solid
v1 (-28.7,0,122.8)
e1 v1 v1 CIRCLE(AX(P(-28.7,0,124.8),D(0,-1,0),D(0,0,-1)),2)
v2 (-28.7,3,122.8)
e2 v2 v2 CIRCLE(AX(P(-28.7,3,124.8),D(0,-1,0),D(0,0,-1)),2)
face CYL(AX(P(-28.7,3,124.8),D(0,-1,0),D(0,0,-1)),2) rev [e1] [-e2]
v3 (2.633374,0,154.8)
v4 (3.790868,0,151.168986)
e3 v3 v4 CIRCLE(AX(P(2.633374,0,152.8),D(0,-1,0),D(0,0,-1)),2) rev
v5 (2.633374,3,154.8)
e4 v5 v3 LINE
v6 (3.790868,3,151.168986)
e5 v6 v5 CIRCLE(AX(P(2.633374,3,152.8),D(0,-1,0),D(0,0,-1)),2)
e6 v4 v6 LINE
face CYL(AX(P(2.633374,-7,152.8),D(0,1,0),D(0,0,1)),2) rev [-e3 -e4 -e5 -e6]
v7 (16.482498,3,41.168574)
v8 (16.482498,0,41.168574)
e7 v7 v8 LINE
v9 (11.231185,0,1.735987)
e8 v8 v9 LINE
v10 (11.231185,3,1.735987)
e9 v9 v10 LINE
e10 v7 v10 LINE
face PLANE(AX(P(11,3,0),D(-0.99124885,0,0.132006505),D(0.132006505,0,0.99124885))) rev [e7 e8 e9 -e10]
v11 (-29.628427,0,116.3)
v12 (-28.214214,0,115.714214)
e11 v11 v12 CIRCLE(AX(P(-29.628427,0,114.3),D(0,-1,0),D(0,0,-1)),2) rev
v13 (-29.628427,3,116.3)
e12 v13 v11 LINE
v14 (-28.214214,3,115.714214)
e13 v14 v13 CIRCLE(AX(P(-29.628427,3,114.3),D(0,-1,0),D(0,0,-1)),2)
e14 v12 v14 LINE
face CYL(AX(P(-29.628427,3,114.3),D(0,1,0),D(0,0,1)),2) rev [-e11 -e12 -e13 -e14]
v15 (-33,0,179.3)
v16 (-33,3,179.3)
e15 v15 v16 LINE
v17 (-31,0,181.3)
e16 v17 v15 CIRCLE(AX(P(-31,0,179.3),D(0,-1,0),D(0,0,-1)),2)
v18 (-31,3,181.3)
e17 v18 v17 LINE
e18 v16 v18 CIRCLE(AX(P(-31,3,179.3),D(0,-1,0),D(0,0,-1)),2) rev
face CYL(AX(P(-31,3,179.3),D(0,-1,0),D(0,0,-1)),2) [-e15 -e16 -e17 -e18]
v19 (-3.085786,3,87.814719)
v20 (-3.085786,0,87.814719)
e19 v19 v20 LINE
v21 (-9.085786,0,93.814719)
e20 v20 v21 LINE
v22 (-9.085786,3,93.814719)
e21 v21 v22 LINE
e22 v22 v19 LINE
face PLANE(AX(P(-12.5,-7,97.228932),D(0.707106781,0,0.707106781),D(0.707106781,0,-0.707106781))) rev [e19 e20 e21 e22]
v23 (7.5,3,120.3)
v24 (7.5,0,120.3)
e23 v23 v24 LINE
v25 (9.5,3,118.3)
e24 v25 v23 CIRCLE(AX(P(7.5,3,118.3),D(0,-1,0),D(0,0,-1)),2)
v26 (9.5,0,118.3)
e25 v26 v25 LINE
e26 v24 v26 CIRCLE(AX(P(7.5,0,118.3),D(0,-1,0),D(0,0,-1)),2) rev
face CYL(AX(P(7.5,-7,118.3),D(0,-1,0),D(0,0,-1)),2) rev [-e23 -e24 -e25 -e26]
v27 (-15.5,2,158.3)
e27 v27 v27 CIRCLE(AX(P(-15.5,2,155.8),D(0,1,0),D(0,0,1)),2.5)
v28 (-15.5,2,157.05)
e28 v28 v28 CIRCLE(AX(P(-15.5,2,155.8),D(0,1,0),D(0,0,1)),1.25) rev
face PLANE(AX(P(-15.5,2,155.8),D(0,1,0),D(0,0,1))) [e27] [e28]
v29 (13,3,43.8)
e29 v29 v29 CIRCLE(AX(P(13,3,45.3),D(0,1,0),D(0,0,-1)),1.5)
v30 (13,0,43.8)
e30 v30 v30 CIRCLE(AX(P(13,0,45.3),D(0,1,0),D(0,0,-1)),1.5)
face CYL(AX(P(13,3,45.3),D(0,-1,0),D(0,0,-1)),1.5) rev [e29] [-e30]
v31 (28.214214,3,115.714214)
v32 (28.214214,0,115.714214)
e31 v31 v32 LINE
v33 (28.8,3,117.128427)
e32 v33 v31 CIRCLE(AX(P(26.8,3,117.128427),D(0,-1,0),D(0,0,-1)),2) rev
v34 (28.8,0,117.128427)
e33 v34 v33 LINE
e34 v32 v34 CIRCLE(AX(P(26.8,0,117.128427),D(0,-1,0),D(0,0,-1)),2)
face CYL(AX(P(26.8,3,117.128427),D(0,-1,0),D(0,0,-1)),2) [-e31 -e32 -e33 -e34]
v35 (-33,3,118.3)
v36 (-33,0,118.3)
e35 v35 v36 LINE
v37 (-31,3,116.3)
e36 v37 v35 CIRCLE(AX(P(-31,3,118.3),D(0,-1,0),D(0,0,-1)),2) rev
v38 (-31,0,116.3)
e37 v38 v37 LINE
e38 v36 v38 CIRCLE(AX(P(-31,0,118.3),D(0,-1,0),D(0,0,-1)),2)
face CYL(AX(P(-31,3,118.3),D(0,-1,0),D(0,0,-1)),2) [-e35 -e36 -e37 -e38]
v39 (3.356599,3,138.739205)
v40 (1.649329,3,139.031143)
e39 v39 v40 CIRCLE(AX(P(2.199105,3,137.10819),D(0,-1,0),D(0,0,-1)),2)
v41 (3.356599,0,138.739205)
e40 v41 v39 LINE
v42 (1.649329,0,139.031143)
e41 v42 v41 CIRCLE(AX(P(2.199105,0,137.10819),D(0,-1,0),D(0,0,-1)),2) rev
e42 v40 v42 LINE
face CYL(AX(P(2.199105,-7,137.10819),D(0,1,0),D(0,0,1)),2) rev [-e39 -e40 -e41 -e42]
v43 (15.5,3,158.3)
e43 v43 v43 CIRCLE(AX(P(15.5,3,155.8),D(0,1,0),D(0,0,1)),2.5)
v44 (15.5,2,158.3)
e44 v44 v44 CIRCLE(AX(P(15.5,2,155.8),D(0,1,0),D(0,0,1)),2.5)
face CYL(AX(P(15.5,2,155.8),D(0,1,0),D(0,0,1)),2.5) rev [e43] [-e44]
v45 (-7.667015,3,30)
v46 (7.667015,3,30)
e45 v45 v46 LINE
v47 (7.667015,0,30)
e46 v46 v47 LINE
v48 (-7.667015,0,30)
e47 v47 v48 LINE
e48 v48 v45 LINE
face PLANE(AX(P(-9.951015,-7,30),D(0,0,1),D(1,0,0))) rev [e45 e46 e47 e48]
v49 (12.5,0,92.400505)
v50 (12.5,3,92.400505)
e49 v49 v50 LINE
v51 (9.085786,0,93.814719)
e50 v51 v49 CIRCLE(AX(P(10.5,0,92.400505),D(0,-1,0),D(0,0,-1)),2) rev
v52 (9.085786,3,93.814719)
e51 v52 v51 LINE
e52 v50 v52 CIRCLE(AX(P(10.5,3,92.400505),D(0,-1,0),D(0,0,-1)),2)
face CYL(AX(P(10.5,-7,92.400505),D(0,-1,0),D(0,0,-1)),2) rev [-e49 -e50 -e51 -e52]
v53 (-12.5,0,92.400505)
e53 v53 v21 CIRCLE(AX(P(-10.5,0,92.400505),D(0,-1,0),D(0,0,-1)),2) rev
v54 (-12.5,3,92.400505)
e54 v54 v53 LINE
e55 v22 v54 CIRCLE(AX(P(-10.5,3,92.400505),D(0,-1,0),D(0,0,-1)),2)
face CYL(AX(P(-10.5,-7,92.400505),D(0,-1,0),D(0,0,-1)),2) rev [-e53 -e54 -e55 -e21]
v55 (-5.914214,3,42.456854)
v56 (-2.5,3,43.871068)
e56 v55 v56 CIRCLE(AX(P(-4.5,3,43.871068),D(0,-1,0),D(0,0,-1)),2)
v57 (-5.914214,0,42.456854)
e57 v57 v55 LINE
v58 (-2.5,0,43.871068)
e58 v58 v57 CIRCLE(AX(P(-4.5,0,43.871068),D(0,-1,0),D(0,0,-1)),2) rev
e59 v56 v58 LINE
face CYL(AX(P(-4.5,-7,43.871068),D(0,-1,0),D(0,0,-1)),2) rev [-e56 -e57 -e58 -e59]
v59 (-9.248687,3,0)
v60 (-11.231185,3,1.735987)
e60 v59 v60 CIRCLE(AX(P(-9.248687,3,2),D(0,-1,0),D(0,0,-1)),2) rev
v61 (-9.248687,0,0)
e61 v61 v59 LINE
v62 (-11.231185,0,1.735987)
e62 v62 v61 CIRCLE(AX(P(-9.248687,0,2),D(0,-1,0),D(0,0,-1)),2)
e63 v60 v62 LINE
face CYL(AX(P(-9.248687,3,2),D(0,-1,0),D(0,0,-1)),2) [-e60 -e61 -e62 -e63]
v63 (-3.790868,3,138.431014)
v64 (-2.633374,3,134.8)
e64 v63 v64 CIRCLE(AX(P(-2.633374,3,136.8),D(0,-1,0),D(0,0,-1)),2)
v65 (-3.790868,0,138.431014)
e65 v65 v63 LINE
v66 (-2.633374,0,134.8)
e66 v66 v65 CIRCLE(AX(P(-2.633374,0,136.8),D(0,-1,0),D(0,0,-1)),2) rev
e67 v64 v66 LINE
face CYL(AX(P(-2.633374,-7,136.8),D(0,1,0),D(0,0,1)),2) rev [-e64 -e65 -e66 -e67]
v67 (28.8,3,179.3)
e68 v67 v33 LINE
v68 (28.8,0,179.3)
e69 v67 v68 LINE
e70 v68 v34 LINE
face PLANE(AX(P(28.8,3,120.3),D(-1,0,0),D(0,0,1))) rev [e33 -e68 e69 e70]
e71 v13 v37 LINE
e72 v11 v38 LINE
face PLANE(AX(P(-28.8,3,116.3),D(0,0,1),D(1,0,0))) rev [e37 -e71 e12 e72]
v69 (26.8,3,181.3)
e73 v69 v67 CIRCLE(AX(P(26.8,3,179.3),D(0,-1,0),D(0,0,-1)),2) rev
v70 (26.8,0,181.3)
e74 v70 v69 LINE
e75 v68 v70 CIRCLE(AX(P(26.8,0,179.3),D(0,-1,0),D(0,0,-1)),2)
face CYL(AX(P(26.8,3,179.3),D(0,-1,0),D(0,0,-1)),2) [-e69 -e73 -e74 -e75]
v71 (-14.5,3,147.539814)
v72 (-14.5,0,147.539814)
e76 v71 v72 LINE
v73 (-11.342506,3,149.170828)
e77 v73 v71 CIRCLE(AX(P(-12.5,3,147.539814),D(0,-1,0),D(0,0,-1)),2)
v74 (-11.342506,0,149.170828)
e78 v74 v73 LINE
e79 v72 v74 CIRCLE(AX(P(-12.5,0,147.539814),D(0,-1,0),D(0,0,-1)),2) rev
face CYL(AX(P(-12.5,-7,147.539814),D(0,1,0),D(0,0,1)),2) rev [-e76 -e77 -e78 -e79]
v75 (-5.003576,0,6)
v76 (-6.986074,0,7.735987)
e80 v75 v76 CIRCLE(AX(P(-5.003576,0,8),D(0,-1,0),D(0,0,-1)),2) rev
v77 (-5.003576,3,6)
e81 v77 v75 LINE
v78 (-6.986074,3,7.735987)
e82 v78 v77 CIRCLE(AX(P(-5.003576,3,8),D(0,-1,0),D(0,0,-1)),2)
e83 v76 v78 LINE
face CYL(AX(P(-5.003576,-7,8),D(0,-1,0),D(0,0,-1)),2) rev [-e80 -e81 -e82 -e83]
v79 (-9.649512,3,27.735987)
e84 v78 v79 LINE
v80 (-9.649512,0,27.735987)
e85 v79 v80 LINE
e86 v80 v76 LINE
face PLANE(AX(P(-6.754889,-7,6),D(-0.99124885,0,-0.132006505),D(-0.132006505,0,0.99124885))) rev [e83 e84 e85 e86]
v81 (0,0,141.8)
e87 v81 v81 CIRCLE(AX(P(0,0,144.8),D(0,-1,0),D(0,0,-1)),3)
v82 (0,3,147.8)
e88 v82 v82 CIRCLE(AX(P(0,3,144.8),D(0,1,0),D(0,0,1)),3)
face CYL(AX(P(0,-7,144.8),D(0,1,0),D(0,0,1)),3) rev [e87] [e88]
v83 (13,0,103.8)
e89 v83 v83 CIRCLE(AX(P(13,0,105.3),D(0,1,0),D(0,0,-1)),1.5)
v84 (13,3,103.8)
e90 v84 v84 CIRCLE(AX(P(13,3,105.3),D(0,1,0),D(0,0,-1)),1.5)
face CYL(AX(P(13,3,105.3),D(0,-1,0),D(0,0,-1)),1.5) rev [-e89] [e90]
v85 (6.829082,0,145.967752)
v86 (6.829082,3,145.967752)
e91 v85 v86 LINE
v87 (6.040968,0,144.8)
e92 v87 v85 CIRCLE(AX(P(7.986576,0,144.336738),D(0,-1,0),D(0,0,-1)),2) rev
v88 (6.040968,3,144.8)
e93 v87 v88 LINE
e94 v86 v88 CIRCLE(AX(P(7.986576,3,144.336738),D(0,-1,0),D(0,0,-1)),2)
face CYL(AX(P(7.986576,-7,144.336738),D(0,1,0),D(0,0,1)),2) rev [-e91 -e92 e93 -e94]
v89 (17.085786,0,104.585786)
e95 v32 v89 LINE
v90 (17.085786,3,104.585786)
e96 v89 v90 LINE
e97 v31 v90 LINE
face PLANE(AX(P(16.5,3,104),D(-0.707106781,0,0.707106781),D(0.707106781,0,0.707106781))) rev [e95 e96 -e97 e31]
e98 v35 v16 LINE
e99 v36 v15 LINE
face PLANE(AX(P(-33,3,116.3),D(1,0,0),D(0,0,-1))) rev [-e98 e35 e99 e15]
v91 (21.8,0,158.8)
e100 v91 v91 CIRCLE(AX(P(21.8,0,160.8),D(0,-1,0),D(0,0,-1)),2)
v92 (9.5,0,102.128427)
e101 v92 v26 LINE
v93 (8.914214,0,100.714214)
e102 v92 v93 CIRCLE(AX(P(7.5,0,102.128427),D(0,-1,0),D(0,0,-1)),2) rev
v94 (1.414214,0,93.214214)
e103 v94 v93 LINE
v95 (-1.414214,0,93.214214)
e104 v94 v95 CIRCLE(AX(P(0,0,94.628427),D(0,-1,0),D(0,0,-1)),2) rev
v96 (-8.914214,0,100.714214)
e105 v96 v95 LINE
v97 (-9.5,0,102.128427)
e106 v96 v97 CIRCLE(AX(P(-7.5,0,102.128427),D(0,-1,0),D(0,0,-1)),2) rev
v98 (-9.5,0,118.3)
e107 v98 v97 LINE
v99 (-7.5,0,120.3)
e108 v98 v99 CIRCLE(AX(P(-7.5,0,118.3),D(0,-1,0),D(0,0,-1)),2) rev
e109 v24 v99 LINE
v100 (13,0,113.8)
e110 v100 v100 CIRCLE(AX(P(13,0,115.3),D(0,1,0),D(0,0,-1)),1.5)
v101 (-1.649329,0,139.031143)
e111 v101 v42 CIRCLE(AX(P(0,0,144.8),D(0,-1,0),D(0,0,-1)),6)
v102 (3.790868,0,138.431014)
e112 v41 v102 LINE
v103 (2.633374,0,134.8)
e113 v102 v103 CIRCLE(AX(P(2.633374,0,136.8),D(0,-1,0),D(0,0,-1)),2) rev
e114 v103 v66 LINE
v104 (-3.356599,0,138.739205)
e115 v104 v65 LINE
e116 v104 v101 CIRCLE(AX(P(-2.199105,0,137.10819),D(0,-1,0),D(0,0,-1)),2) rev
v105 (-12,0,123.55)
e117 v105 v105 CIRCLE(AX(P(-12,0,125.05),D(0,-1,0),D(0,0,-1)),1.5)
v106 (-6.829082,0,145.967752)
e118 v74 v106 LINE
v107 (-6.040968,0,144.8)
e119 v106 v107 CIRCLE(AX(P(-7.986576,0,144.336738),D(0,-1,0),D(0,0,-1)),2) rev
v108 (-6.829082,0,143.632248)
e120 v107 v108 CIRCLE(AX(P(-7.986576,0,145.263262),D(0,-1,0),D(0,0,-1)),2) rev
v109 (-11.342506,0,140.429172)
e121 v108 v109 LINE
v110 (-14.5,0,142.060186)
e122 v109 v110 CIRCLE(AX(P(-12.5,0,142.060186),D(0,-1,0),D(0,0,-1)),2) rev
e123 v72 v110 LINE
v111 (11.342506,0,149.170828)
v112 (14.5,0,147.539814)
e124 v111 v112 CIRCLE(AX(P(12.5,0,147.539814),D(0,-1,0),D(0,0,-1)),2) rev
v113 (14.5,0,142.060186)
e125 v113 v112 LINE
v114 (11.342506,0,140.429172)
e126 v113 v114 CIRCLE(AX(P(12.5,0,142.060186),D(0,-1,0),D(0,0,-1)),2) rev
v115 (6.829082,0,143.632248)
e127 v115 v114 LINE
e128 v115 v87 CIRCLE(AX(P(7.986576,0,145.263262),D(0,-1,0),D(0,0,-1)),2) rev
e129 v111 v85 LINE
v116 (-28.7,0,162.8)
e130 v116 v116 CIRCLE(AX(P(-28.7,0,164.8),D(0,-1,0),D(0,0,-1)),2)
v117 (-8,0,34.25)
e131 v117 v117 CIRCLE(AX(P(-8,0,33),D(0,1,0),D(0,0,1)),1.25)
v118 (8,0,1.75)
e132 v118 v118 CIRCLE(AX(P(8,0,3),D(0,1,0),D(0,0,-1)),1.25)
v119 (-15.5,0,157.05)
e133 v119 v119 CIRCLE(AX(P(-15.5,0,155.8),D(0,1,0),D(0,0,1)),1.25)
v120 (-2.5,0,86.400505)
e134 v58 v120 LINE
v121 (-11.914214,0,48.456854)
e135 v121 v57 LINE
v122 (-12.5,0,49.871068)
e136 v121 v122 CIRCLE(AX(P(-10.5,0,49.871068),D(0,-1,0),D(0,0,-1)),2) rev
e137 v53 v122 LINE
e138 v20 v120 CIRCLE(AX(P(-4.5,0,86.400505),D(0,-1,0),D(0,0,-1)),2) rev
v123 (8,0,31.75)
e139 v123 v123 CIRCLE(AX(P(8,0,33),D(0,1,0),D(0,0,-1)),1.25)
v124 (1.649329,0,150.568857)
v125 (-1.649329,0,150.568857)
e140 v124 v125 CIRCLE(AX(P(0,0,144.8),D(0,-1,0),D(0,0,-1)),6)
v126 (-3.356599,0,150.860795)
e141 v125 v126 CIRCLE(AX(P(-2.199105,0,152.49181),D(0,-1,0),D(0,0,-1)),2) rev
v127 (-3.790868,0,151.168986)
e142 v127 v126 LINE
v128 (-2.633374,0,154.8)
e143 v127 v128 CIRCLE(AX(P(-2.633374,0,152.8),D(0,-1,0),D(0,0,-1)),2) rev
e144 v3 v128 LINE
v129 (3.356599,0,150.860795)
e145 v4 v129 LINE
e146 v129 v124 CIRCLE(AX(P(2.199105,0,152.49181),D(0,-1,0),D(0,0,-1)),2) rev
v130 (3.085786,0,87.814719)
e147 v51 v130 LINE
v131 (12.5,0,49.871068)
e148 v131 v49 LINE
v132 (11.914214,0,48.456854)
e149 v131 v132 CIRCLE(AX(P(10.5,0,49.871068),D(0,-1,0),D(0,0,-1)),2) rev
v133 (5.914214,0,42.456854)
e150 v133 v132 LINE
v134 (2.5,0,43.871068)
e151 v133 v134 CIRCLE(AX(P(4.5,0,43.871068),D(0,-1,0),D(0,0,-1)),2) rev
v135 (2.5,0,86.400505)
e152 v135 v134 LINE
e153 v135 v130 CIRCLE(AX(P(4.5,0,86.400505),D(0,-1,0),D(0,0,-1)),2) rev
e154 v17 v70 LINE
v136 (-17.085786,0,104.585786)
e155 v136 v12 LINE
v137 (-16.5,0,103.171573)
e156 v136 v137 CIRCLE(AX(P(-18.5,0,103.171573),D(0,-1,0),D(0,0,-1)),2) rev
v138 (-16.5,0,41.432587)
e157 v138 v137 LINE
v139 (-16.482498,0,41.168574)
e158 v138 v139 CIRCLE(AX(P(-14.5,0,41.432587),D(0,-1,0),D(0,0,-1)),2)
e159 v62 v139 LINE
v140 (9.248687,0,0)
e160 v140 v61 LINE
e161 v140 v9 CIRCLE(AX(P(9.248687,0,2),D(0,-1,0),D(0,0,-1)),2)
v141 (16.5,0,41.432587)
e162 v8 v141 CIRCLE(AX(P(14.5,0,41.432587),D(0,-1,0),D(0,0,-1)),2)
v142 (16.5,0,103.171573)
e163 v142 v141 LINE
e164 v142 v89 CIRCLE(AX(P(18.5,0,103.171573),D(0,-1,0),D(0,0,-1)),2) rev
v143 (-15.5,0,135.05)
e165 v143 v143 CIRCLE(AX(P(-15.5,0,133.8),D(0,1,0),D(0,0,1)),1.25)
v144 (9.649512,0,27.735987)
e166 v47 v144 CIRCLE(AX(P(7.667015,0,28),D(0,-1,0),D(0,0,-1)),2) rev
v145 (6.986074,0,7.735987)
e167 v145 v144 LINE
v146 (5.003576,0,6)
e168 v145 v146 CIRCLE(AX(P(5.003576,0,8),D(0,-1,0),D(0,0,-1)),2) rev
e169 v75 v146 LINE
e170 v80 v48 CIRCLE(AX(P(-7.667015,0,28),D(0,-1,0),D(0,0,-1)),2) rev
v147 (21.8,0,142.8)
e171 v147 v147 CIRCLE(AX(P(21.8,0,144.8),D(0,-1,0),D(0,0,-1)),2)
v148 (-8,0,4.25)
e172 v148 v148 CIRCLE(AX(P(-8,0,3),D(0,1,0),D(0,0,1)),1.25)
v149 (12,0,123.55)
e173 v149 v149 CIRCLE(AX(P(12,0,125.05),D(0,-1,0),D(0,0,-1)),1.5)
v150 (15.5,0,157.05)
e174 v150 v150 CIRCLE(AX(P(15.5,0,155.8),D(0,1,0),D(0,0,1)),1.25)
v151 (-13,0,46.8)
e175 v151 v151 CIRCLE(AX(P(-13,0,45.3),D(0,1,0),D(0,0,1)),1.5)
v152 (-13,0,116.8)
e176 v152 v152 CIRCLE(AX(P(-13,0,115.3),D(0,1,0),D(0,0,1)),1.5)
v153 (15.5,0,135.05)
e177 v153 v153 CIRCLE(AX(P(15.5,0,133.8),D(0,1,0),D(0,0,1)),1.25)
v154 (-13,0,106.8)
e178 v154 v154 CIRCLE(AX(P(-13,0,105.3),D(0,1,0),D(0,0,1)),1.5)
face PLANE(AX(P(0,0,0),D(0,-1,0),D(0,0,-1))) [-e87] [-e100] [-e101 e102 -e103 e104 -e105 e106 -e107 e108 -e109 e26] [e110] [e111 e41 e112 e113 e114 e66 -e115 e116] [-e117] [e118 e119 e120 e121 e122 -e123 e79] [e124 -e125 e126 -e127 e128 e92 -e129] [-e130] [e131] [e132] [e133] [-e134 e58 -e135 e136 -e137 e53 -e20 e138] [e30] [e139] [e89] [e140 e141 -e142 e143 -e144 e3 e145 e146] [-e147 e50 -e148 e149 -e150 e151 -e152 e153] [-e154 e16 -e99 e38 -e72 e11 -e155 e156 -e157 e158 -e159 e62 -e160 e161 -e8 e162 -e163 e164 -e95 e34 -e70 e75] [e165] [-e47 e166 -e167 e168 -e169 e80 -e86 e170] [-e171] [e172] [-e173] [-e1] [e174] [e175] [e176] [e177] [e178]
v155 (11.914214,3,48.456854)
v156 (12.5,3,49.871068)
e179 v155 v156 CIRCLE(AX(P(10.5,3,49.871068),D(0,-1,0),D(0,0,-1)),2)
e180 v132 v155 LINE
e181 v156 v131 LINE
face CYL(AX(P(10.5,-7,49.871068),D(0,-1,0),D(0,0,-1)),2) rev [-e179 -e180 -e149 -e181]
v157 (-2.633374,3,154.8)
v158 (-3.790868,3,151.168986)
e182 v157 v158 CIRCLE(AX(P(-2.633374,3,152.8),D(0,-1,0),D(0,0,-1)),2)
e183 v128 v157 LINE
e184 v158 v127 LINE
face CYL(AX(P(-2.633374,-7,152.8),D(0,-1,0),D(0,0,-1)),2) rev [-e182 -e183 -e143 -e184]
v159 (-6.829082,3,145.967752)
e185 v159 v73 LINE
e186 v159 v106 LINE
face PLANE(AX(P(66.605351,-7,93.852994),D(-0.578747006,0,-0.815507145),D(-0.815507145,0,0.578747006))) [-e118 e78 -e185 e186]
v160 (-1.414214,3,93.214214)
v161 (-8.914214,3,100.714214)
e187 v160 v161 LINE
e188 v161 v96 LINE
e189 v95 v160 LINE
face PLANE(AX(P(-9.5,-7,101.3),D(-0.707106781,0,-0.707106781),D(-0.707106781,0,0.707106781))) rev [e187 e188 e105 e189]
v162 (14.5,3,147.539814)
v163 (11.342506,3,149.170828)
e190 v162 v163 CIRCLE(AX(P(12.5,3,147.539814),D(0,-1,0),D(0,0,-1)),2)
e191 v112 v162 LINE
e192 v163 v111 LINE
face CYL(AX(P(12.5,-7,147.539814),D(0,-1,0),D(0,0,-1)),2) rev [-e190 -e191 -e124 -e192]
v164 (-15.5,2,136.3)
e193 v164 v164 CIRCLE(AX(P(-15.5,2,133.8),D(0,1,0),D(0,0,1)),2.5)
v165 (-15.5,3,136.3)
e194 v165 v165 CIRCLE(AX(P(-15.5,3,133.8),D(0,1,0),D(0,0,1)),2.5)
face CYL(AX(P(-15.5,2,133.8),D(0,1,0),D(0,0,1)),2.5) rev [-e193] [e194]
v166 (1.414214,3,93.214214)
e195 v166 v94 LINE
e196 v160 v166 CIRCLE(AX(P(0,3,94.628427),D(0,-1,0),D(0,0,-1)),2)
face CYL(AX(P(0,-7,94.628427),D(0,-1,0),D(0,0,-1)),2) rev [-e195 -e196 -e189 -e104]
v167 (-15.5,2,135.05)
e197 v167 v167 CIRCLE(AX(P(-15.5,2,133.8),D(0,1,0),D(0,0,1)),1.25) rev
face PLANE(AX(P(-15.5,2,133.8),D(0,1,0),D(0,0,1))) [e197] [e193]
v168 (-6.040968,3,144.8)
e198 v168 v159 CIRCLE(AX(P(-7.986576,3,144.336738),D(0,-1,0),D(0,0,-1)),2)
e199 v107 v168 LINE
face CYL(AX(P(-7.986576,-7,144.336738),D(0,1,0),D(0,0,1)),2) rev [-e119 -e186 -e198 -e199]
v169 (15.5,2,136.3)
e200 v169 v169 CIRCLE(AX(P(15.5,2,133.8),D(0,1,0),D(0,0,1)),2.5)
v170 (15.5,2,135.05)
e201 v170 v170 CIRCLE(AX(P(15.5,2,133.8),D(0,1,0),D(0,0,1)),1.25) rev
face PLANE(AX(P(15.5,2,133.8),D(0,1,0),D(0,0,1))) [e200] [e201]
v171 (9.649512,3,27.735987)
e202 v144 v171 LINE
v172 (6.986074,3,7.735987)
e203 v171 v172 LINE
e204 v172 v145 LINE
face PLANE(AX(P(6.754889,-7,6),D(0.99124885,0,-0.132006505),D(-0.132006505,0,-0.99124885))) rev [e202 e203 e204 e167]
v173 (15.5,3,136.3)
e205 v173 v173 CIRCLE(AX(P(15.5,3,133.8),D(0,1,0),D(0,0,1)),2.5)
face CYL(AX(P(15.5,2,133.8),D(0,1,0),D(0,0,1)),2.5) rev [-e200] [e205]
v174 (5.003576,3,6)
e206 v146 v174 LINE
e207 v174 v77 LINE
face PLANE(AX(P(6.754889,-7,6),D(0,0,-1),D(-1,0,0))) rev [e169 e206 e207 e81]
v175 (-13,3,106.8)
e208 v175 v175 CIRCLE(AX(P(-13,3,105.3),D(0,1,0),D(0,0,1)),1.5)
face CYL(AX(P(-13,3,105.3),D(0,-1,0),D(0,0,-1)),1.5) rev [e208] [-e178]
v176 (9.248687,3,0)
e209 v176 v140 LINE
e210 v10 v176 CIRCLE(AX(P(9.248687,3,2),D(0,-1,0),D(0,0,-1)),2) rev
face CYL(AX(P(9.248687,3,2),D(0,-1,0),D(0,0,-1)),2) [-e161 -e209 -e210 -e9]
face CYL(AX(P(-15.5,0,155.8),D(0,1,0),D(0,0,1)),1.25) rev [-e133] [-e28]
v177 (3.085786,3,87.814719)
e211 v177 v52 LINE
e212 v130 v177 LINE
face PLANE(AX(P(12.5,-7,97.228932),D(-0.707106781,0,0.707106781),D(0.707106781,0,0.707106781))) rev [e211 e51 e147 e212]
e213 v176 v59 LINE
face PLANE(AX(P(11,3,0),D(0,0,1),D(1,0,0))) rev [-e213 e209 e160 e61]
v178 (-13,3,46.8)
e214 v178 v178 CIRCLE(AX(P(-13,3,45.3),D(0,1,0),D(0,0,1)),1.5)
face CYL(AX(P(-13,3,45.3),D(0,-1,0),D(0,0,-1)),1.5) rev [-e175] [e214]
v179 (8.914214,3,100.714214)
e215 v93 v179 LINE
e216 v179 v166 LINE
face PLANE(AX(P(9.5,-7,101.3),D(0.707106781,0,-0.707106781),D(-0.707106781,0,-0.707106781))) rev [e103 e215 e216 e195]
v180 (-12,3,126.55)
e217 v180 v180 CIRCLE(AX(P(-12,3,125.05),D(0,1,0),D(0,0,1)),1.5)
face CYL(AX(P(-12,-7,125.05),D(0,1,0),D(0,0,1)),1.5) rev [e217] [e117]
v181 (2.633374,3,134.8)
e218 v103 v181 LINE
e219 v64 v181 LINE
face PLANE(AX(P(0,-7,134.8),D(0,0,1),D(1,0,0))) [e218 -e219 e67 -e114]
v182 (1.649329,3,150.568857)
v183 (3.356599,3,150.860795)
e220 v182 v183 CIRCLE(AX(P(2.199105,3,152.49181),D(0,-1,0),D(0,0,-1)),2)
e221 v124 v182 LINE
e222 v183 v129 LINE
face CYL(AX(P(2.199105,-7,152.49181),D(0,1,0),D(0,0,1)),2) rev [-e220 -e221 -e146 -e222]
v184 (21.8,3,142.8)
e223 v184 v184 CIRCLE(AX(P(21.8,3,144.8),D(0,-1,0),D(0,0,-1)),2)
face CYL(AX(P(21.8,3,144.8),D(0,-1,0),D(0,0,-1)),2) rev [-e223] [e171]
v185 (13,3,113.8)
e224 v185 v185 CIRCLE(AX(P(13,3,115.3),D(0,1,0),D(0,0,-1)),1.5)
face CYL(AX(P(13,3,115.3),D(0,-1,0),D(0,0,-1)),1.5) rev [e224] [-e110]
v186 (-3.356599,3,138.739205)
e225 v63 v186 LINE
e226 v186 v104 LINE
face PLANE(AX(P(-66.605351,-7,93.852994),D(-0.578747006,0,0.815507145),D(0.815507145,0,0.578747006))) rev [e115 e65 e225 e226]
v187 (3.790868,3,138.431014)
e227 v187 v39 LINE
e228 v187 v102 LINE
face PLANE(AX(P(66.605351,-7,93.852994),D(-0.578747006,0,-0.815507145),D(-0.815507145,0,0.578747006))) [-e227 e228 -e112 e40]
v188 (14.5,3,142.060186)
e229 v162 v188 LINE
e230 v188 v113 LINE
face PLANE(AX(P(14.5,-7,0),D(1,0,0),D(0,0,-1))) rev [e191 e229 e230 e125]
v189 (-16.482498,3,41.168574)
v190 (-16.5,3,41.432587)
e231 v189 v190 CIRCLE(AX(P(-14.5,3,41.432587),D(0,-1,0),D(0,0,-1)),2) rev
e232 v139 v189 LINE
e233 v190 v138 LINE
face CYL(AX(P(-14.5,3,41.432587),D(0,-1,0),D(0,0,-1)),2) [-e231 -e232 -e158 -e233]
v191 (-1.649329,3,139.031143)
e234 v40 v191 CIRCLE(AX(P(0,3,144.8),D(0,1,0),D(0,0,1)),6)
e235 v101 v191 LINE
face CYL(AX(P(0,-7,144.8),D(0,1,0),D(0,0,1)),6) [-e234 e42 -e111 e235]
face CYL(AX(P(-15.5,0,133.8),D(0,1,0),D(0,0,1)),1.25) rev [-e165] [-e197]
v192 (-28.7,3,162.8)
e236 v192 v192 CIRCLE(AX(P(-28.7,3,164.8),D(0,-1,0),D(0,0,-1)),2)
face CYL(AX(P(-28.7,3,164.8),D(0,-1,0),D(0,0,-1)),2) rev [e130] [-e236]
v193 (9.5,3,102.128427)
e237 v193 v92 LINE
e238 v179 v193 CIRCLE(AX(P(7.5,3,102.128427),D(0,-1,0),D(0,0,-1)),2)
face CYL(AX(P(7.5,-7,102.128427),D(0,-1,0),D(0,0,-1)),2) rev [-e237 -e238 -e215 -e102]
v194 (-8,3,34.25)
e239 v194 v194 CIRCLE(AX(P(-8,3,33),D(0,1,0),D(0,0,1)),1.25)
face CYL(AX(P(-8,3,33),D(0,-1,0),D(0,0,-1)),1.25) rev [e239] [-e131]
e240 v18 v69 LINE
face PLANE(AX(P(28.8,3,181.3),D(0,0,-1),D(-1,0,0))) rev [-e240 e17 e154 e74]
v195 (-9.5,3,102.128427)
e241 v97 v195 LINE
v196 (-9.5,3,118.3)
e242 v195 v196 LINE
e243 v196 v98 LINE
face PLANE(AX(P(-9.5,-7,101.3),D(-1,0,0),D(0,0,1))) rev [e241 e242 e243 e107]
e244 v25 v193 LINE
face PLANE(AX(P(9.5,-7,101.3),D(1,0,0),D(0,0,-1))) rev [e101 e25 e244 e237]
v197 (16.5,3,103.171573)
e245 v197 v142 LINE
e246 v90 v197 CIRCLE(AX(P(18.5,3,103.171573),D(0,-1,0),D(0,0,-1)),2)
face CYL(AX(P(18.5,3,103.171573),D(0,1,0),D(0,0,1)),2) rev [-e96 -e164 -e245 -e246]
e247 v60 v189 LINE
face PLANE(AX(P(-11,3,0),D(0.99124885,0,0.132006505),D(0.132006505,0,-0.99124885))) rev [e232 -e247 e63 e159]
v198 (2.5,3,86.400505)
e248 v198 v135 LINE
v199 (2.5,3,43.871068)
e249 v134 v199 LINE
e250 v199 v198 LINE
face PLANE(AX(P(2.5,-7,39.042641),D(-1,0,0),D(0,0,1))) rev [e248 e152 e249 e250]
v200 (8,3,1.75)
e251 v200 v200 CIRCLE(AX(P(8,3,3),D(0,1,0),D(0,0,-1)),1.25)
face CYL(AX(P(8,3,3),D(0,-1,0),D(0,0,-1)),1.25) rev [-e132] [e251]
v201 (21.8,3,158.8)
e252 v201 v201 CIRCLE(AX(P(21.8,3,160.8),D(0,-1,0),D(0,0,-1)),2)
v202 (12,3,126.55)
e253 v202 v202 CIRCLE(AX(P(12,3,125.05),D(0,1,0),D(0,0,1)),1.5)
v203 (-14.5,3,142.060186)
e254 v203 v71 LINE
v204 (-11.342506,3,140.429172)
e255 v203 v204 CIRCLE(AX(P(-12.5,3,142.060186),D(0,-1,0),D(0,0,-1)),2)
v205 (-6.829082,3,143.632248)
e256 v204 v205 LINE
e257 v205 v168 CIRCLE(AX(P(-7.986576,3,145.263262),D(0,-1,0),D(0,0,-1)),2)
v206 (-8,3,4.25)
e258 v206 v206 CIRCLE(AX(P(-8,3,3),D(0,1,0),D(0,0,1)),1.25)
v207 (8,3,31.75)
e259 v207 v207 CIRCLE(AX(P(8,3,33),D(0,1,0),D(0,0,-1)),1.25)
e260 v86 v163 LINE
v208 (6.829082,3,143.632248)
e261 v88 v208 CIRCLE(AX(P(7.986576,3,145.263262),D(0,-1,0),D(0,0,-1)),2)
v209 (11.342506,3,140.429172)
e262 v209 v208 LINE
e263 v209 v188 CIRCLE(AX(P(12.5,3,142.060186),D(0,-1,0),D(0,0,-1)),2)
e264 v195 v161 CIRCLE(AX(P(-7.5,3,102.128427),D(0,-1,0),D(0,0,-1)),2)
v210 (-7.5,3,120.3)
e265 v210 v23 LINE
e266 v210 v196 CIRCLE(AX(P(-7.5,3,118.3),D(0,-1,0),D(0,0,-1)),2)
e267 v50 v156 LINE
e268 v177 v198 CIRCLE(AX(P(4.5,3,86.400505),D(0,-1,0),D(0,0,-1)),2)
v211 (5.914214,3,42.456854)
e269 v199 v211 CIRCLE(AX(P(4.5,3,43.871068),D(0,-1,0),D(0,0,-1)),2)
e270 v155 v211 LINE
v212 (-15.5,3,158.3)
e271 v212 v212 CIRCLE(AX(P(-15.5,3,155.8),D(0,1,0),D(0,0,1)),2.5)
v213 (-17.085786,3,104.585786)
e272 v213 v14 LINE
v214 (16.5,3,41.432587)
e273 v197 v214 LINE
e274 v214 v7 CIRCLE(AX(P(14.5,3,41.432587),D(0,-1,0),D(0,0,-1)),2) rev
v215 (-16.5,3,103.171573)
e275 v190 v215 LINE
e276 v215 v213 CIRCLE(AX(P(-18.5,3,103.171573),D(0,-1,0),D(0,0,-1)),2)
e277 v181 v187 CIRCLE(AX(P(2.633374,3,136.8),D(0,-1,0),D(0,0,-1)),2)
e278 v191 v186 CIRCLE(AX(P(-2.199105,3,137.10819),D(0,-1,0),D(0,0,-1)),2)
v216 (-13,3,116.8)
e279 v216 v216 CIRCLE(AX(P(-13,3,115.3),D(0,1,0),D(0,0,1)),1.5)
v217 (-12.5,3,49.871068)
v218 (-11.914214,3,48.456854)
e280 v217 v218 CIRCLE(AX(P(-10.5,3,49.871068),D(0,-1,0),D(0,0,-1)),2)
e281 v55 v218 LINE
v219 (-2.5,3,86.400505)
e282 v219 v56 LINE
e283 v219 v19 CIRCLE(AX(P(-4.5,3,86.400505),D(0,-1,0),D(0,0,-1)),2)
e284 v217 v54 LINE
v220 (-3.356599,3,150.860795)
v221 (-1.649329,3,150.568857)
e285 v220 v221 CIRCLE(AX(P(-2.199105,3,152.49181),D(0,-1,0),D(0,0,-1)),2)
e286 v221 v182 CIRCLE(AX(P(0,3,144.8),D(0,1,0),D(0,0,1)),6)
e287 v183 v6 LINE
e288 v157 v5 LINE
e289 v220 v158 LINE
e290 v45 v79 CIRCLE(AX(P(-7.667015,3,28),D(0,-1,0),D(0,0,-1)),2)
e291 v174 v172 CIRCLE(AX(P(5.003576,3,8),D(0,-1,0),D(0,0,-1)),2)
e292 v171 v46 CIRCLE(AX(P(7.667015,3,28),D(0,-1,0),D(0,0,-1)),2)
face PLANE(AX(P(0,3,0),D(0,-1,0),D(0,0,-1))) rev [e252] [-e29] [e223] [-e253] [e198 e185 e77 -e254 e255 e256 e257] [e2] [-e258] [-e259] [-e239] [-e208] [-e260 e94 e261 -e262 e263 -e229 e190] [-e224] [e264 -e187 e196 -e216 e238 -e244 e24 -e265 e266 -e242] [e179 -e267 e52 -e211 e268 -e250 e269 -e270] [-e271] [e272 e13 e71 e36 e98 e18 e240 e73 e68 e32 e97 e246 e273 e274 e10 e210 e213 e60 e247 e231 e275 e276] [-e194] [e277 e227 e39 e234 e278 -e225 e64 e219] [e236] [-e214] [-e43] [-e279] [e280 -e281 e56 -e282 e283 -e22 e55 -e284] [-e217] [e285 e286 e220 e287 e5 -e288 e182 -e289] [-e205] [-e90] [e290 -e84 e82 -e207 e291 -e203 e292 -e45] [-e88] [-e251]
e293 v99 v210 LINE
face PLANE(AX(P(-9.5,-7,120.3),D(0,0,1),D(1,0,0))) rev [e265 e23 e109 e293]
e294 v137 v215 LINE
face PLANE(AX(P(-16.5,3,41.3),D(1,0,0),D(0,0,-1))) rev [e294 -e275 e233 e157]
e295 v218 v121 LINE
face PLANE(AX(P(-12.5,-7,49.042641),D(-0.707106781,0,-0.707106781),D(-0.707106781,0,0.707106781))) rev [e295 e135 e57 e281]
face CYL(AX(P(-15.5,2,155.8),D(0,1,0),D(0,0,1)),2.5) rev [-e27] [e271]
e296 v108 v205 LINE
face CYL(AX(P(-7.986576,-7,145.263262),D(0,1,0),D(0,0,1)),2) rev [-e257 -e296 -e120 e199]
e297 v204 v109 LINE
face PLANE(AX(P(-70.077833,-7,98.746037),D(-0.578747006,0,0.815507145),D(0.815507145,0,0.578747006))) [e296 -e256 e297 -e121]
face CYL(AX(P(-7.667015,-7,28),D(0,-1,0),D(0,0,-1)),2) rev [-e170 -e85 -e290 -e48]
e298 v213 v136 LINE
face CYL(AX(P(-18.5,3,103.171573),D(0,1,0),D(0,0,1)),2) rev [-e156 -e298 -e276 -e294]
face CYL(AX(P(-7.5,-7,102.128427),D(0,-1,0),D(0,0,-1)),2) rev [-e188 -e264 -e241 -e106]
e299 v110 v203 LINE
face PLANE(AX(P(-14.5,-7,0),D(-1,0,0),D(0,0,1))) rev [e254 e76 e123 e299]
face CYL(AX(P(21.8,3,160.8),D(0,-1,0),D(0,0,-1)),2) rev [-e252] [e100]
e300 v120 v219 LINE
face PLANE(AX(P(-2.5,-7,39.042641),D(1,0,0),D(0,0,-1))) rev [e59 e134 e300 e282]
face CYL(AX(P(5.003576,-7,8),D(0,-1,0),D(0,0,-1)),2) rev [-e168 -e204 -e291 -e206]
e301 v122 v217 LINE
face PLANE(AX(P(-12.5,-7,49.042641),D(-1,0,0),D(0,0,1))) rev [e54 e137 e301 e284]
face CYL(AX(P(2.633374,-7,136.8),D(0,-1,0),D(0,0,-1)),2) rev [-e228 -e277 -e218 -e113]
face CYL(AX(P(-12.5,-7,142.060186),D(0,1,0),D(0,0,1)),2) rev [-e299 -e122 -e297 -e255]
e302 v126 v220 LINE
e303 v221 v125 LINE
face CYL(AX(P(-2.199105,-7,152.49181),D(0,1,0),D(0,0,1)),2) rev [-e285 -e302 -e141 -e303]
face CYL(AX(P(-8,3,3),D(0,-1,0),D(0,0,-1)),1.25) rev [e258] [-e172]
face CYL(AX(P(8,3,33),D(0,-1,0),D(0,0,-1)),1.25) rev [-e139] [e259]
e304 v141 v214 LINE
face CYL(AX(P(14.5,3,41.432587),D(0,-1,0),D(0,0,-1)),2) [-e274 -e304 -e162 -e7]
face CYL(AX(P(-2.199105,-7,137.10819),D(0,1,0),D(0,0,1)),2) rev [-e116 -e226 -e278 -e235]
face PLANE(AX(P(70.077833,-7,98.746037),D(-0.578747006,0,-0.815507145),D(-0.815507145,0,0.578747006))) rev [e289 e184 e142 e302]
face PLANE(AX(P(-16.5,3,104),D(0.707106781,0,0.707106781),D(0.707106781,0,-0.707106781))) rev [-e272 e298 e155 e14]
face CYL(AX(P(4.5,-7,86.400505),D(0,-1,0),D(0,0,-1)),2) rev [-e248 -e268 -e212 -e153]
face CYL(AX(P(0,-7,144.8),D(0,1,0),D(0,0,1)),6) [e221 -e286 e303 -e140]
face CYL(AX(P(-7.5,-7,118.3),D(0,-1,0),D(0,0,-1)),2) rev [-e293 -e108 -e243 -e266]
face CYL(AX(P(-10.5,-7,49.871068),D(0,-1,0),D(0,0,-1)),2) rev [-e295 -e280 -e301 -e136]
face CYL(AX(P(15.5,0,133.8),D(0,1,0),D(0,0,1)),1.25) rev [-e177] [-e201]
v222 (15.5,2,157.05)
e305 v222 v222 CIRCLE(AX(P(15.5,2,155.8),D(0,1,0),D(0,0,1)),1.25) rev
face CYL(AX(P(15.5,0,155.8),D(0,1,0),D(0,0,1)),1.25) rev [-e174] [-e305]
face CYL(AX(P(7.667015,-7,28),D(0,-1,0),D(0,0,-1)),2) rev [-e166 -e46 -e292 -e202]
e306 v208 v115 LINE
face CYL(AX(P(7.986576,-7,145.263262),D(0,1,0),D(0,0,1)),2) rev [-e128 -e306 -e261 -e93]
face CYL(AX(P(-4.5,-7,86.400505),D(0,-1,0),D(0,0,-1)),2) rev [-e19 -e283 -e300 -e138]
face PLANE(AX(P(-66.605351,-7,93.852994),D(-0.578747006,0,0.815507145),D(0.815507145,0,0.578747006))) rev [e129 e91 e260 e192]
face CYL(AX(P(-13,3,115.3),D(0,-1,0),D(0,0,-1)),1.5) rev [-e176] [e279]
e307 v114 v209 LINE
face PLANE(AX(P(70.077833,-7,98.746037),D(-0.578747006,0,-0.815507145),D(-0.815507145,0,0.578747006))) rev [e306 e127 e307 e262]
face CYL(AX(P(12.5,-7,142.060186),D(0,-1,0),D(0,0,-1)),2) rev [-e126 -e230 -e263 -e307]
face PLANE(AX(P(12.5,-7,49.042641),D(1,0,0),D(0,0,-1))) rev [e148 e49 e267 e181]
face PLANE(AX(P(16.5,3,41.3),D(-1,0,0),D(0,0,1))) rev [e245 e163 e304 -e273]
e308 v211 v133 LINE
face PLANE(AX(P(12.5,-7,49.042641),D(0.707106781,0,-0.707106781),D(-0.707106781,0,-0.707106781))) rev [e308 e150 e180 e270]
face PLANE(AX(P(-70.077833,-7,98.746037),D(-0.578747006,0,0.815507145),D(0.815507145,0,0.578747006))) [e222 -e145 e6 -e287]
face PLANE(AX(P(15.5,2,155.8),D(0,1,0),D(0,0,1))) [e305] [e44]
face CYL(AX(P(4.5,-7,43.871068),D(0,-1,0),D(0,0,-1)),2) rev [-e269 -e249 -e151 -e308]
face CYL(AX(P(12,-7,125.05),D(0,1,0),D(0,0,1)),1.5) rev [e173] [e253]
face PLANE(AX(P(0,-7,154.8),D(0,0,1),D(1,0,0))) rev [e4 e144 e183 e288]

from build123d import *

# Parameters (mm, degrees)
SKETCH_1_R          = 1.25
SKETCH_1_R_2        = 1.5
EXTRUDE_1_DEPTH     = 3
CUT_EXTRUDE_1_DEPTH = 10
FILLET_1_R          = 2
SKETCH_3_R          = 2
CUT_EXTRUDE_2_DEPTH = 185.303255533
SKETCH_5_R          = 1.25
CUT_EXTRUDE_3_DEPTH = 185.303255533
SKETCH_6_R          = 3
CUT_EXTRUDE_4_DEPTH = 10
SKETCH_7_R          = 2.5
CUT_EXTRUDE_5_DEPTH = 1
FILLET_2_R          = 2
SKETCH_8_R          = 1.5
CUT_EXTRUDE_6_DEPTH = 10


with BuildPart() as part:
    # 草图1 → 凸台-拉伸1 (new body)
    with BuildSketch(Plane(origin=(0, 0, 0), x_dir=(1, 0, 0), z_dir=(0, 1, 0))):
        Polygon((11, 0), (-11, 0), (-16.5, -41.3), (-16.5, -104), (-28.8, -116.3), (-33, -116.3), (-33, -181.3), (28.8, -181.3), (28.8, -120.3), (28.8, -116.3), (16.5, -104), (16.5, -41.3), align=None)
        with Locations(Location((-8, -3, 0), (0, 0, 270))):
            Circle(SKETCH_1_R, mode=Mode.SUBTRACT)
        with Locations(Location((-8, -33, 0), (0, 0, 270))):
            Circle(SKETCH_1_R, mode=Mode.SUBTRACT)
        with Locations(Location((8, -33, 0), (0, 0, 90))):
            Circle(SKETCH_1_R, mode=Mode.SUBTRACT)
        with Locations(Location((8, -3, 0), (0, 0, 90))):
            Circle(SKETCH_1_R, mode=Mode.SUBTRACT)
        with Locations(Location((-13, -45.3, 0), (0, 0, 270))):
            Circle(SKETCH_1_R_2, mode=Mode.SUBTRACT)
        with Locations(Location((-13, -105.3, 0), (0, 0, 270))):
            Circle(SKETCH_1_R_2, mode=Mode.SUBTRACT)
        with Locations(Location((-13, -115.3, 0), (0, 0, 270))):
            Circle(SKETCH_1_R_2, mode=Mode.SUBTRACT)
        with Locations(Location((13, -115.3, 0), (0, 0, 90))):
            Circle(SKETCH_1_R_2, mode=Mode.SUBTRACT)
        with Locations(Location((13, -105.3, 0), (0, 0, 90))):
            Circle(SKETCH_1_R_2, mode=Mode.SUBTRACT)
        with Locations(Location((13, -45.3, 0), (0, 0, 90))):
            Circle(SKETCH_1_R_2, mode=Mode.SUBTRACT)
    extrude(amount=EXTRUDE_1_DEPTH)

    # 草图2 → 切除-拉伸1 (cut)
    with BuildSketch(Plane(origin=(0, 3, 0), x_dir=(1, 0, 0), z_dir=(0, 1, 0))):
        Polygon((6.754889433, -6), (-6.754889433, -6), (-9.951015341, -30), (9.951015341, -30), align=None)
        Polygon((12.5, -97.228932188), (2.5, -87.228932188), (2.5, -39.042640687), (12.5, -49.042640687), align=None)
        Polygon((-12.5, -49.042640687), (-2.5, -39.042640687), (-2.5, -87.228932188), (-12.5, -97.228932188), align=None)
        Polygon((-9.5, -101.3), (0, -91.8), (9.5, -101.3), (9.5, -120.3), (-9.5, -120.3), align=None)
    extrude(amount=-CUT_EXTRUDE_1_DEPTH, mode=Mode.SUBTRACT)

    # 圆角1
    fillet_1_edges = [part.edges().sort_by_distance(p)[0] for p in [
        (-9.951015341, 1.5, 30),
        (-6.754889433, 1.5, 6),
        (6.754889433, 1.5, 6),
        (9.951015341, 1.5, 30),
        (0, 1.5, 91.8),
        (9.5, 1.5, 101.3),
        (9.5, 1.5, 120.3),
        (-9.5, 1.5, 120.3),
        (-9.5, 1.5, 101.3),
        (12.5, 1.5, 49.042640687),
        (12.5, 1.5, 97.228932188),
        (2.5, 1.5, 87.228932188),
        (2.5, 1.5, 39.042640687),
        (-12.5, 1.5, 97.228932188),
        (-12.5, 1.5, 49.042640687),
        (-2.5, 1.5, 39.042640687),
        (-2.5, 1.5, 87.228932188),
        (-11, 1.5, 0),
        (11, 1.5, 0),
        (16.5, 1.5, 41.3),
        (16.5, 1.5, 104),
        (28.8, 1.5, 116.3),
        (28.8, 1.5, 181.3),
        (-33, 1.5, 181.3),
        (-33, 1.5, 116.3),
        (-28.8, 1.5, 116.3),
        (-16.5, 1.5, 104),
        (-16.5, 1.5, 41.3),
    ]]
    fillet(fillet_1_edges, radius=FILLET_1_R)

    # 草图3 → 切除-拉伸2 (cut, through all)
    with BuildSketch(Plane.XZ):
        with Locations(Location((-28.7, 164.8, 0), (0, 0, 270))):
            Circle(SKETCH_3_R)
        with Locations(Location((-28.7, 124.8, 0), (0, 0, 270))):
            Circle(SKETCH_3_R)
        with Locations(Location((21.8, 160.8, 0), (0, 0, 270))):
            Circle(SKETCH_3_R)
        with Locations(Location((21.8, 144.8, 0), (0, 0, 270))):
            Circle(SKETCH_3_R)
    extrude(amount=-CUT_EXTRUDE_2_DEPTH, mode=Mode.SUBTRACT)

    # 草图5 → 切除-拉伸3 (cut, through all)
    with BuildSketch(Plane(origin=(0, 3, 0), x_dir=(1, 0, 0), z_dir=(0, 1, 0))):
        with Locations(Location((15.5, -133.8, 0), (0, 0, 270))):
            Circle(SKETCH_5_R)
        with Locations(Location((-15.5, -133.8, 0), (0, 0, 270))):
            Circle(SKETCH_5_R)
        with Locations(Location((-15.5, -155.8, 0), (0, 0, 270))):
            Circle(SKETCH_5_R)
        with Locations(Location((15.5, -155.8, 0), (0, 0, 270))):
            Circle(SKETCH_5_R)
    extrude(amount=-CUT_EXTRUDE_3_DEPTH, mode=Mode.SUBTRACT)

    # 草图6 → 切除-拉伸4 (cut)
    with BuildSketch(Plane(origin=(0, 3, 0), x_dir=(1, 0, 0), z_dir=(0, 1, 0))):
        with BuildLine():
            Line((8.907296961, -134.8), (-8.907296961, -134.8))
            Line((-8.907296961, -134.8), (-2.501258408, -139.346220909))
            ThreePointArc((-2.501258408, -139.346220909), (0, -138.8), (2.501258408, -139.346220909))
            Line((2.501258408, -139.346220909), (8.907296961, -134.8))
        make_face()
        with BuildLine():
            Line((14.5, -151.411630102), (14.5, -138.188369898))
            Line((14.5, -138.188369898), (5.973740444, -144.239263777))
            ThreePointArc((5.973740444, -144.239263777), (5.993431516, -144.51932462), (6, -144.8))
            ThreePointArc((6, -144.8), (5.993431516, -145.08067538), (5.973740444, -145.360736223))
            Line((5.973740444, -145.360736223), (14.5, -151.411630102))
        make_face()
        with BuildLine():
            Line((-2.501258408, -150.253779091), (-8.907296961, -154.8))
            Line((-8.907296961, -154.8), (8.907296961, -154.8))
            Line((8.907296961, -154.8), (2.501258408, -150.253779091))
            ThreePointArc((2.501258408, -150.253779091), (0, -150.8), (-2.501258408, -150.253779091))
        make_face()
        with BuildLine():
            Line((-5.973740444, -144.239263777), (-14.5, -138.188369898))
            Line((-14.5, -138.188369898), (-14.5, -151.411630102))
            Line((-14.5, -151.411630102), (-5.973740444, -145.360736223))
            ThreePointArc((-5.973740444, -145.360736223), (-6, -144.8), (-5.973740444, -144.239263777))
        make_face()
        with Locations(Location((0, -144.8, 0), (0, 0, 270))):
            Circle(SKETCH_6_R)
    extrude(amount=-CUT_EXTRUDE_4_DEPTH, mode=Mode.SUBTRACT)

    # 草图7 → 切除-拉伸5 (cut)
    with BuildSketch(Plane(origin=(0, 3, 0), x_dir=(1, 0, 0), z_dir=(0, 1, 0))):
        with Locations(Location((15.5, -133.8, 0), (0, 0, 270))):
            Circle(SKETCH_7_R)
        with Locations(Location((-15.5, -133.8, 0), (0, 0, 270))):
            Circle(SKETCH_7_R)
        with Locations(Location((-15.5, -155.8, 0), (0, 0, 270))):
            Circle(SKETCH_7_R)
        with Locations(Location((15.5, -155.8, 0), (0, 0, 270))):
            Circle(SKETCH_7_R)
    extrude(amount=-CUT_EXTRUDE_5_DEPTH, mode=Mode.SUBTRACT)

    # 圆角2
    # the kernel refuses this fillet: 2 mm, written as the material it adds along each edge
    with BuildSketch(Plane(origin=(-2.501258408, 3, 150.253779091), x_dir=(-0.8155071447352907, 0, 0.5787470059410188), z_dir=(0, -1, 0)), Plane(origin=(5.973740444, 3, 145.360736223), x_dir=(0.8155071447351953, 0, 0.5787470059411531), z_dir=(0, -1, 0)), Plane(origin=(-5.973740444, 3, 144.239263777), x_dir=(-0.8155071447351933, 0, -0.578747005941156), z_dir=(0, -1, 0)), Plane(origin=(2.501258408, 3, 139.346220909), x_dir=(0.8155071447352105, 0, -0.5787470059411318), z_dir=(0, -1, 0))) as fillet_2_piece_1:
        with BuildLine():
            CenterArc((1.048845576, -2), FILLET_2_R, 90, 51.317812547)
            ThreePointArc((-0.512403924, -0.75), (-0.241988966, -0.384710393), (0, 0))
            Line((0, 0), (1.048845576, 0))
        make_face()
    extrude(amount=3)
    with BuildSketch(Plane(origin=(2.501258408, 3, 150.253779091), x_dir=(0.8155071447352289, 0, 0.578747005941106), z_dir=(0, -1, 0)), Plane(origin=(5.973740444, 3, 144.239263777), x_dir=(0.815507144735187, 0, -0.5787470059411648), z_dir=(0, -1, 0)), Plane(origin=(-5.973740444, 3, 145.360736223), x_dir=(-0.8155071447352036, 0, 0.5787470059411416), z_dir=(0, -1, 0)), Plane(origin=(-2.501258408, 3, 139.346220909), x_dir=(-0.8155071447352954, 0, -0.5787470059410122), z_dir=(0, -1, 0))) as fillet_2_piece_2:
        with BuildLine():
            CenterArc((1.048845576, 2), FILLET_2_R, 218.682187453, 51.317812547)
            ThreePointArc((-0.512403924, 0.75), (-0.241988966, 0.384710393), (0, 0))
            Line((0, 0), (1.048845576, 0))
        make_face()
    extrude(amount=3)
    with BuildSketch(Plane(origin=(8.907296961, 3, 154.8), x_dir=(-1, 0, 0), z_dir=(0, -1, 0)), Plane(origin=(-8.907296961, 3, 154.8), x_dir=(0.8155071447352168, 0, -0.578747005941123), z_dir=(0, -1, 0)), Plane(origin=(-8.907296961, 3, 134.8), x_dir=(1, 0, 0), z_dir=(0, -1, 0)), Plane(origin=(8.907296961, 3, 134.8), x_dir=(-0.815507144735218, 0, 0.5787470059411214), z_dir=(0, -1, 0))) as fillet_2_piece_3:
        with BuildLine():
            CenterArc((FILLET_2_R * 3.13696161898, FILLET_2_R), FILLET_2_R, 125.362461887, 144.637538113)
            Line((FILLET_2_R * 2.55821461304, FILLET_2_R * 1.81550714474), (0, 0))
            Line((0, 0), (FILLET_2_R * 3.13696161898, 0))
        make_face()
    extrude(amount=3)
    with BuildSketch(Plane(origin=(14.5, 3, 138.188369898), x_dir=(0, 0, 1), z_dir=(0, -1, 0)), Plane(origin=(14.5, 3, 151.411630102), x_dir=(-0.8155071447352171, 0, -0.5787470059411224), z_dir=(0, -1, 0)), Plane(origin=(-14.5, 3, 151.411630102), x_dir=(0, 0, -1), z_dir=(0, -1, 0)), Plane(origin=(-14.5, 3, 138.188369898), x_dir=(0.8155071447352167, 0, 0.578747005941123), z_dir=(0, -1, 0))) as fillet_2_piece_4:
        with BuildLine():
            CenterArc((FILLET_2_R * 1.93590824573, FILLET_2_R), FILLET_2_R, 144.637538113, 125.362461887)
            Line((FILLET_2_R * 1.12040110099, FILLET_2_R * 1.57874700594), (0, 0))
            Line((0, 0), (FILLET_2_R * 1.93590824573, 0))
        make_face()
    extrude(amount=3)

    # 草图8 → 切除-拉伸6 (cut)
    with BuildSketch(Plane(origin=(0, 3, 0), x_dir=(1, 0, 0), z_dir=(0, 1, 0))):
        with Locations(Location((12, -125.05, 0), (0, 0, 270))):
            Circle(SKETCH_8_R)
        with Locations(Location((-12, -125.05, 0), (0, 0, 270))):
            Circle(SKETCH_8_R)
    extrude(amount=-CUT_EXTRUDE_6_DEPTH, mode=Mode.SUBTRACT)


solid = part.part
